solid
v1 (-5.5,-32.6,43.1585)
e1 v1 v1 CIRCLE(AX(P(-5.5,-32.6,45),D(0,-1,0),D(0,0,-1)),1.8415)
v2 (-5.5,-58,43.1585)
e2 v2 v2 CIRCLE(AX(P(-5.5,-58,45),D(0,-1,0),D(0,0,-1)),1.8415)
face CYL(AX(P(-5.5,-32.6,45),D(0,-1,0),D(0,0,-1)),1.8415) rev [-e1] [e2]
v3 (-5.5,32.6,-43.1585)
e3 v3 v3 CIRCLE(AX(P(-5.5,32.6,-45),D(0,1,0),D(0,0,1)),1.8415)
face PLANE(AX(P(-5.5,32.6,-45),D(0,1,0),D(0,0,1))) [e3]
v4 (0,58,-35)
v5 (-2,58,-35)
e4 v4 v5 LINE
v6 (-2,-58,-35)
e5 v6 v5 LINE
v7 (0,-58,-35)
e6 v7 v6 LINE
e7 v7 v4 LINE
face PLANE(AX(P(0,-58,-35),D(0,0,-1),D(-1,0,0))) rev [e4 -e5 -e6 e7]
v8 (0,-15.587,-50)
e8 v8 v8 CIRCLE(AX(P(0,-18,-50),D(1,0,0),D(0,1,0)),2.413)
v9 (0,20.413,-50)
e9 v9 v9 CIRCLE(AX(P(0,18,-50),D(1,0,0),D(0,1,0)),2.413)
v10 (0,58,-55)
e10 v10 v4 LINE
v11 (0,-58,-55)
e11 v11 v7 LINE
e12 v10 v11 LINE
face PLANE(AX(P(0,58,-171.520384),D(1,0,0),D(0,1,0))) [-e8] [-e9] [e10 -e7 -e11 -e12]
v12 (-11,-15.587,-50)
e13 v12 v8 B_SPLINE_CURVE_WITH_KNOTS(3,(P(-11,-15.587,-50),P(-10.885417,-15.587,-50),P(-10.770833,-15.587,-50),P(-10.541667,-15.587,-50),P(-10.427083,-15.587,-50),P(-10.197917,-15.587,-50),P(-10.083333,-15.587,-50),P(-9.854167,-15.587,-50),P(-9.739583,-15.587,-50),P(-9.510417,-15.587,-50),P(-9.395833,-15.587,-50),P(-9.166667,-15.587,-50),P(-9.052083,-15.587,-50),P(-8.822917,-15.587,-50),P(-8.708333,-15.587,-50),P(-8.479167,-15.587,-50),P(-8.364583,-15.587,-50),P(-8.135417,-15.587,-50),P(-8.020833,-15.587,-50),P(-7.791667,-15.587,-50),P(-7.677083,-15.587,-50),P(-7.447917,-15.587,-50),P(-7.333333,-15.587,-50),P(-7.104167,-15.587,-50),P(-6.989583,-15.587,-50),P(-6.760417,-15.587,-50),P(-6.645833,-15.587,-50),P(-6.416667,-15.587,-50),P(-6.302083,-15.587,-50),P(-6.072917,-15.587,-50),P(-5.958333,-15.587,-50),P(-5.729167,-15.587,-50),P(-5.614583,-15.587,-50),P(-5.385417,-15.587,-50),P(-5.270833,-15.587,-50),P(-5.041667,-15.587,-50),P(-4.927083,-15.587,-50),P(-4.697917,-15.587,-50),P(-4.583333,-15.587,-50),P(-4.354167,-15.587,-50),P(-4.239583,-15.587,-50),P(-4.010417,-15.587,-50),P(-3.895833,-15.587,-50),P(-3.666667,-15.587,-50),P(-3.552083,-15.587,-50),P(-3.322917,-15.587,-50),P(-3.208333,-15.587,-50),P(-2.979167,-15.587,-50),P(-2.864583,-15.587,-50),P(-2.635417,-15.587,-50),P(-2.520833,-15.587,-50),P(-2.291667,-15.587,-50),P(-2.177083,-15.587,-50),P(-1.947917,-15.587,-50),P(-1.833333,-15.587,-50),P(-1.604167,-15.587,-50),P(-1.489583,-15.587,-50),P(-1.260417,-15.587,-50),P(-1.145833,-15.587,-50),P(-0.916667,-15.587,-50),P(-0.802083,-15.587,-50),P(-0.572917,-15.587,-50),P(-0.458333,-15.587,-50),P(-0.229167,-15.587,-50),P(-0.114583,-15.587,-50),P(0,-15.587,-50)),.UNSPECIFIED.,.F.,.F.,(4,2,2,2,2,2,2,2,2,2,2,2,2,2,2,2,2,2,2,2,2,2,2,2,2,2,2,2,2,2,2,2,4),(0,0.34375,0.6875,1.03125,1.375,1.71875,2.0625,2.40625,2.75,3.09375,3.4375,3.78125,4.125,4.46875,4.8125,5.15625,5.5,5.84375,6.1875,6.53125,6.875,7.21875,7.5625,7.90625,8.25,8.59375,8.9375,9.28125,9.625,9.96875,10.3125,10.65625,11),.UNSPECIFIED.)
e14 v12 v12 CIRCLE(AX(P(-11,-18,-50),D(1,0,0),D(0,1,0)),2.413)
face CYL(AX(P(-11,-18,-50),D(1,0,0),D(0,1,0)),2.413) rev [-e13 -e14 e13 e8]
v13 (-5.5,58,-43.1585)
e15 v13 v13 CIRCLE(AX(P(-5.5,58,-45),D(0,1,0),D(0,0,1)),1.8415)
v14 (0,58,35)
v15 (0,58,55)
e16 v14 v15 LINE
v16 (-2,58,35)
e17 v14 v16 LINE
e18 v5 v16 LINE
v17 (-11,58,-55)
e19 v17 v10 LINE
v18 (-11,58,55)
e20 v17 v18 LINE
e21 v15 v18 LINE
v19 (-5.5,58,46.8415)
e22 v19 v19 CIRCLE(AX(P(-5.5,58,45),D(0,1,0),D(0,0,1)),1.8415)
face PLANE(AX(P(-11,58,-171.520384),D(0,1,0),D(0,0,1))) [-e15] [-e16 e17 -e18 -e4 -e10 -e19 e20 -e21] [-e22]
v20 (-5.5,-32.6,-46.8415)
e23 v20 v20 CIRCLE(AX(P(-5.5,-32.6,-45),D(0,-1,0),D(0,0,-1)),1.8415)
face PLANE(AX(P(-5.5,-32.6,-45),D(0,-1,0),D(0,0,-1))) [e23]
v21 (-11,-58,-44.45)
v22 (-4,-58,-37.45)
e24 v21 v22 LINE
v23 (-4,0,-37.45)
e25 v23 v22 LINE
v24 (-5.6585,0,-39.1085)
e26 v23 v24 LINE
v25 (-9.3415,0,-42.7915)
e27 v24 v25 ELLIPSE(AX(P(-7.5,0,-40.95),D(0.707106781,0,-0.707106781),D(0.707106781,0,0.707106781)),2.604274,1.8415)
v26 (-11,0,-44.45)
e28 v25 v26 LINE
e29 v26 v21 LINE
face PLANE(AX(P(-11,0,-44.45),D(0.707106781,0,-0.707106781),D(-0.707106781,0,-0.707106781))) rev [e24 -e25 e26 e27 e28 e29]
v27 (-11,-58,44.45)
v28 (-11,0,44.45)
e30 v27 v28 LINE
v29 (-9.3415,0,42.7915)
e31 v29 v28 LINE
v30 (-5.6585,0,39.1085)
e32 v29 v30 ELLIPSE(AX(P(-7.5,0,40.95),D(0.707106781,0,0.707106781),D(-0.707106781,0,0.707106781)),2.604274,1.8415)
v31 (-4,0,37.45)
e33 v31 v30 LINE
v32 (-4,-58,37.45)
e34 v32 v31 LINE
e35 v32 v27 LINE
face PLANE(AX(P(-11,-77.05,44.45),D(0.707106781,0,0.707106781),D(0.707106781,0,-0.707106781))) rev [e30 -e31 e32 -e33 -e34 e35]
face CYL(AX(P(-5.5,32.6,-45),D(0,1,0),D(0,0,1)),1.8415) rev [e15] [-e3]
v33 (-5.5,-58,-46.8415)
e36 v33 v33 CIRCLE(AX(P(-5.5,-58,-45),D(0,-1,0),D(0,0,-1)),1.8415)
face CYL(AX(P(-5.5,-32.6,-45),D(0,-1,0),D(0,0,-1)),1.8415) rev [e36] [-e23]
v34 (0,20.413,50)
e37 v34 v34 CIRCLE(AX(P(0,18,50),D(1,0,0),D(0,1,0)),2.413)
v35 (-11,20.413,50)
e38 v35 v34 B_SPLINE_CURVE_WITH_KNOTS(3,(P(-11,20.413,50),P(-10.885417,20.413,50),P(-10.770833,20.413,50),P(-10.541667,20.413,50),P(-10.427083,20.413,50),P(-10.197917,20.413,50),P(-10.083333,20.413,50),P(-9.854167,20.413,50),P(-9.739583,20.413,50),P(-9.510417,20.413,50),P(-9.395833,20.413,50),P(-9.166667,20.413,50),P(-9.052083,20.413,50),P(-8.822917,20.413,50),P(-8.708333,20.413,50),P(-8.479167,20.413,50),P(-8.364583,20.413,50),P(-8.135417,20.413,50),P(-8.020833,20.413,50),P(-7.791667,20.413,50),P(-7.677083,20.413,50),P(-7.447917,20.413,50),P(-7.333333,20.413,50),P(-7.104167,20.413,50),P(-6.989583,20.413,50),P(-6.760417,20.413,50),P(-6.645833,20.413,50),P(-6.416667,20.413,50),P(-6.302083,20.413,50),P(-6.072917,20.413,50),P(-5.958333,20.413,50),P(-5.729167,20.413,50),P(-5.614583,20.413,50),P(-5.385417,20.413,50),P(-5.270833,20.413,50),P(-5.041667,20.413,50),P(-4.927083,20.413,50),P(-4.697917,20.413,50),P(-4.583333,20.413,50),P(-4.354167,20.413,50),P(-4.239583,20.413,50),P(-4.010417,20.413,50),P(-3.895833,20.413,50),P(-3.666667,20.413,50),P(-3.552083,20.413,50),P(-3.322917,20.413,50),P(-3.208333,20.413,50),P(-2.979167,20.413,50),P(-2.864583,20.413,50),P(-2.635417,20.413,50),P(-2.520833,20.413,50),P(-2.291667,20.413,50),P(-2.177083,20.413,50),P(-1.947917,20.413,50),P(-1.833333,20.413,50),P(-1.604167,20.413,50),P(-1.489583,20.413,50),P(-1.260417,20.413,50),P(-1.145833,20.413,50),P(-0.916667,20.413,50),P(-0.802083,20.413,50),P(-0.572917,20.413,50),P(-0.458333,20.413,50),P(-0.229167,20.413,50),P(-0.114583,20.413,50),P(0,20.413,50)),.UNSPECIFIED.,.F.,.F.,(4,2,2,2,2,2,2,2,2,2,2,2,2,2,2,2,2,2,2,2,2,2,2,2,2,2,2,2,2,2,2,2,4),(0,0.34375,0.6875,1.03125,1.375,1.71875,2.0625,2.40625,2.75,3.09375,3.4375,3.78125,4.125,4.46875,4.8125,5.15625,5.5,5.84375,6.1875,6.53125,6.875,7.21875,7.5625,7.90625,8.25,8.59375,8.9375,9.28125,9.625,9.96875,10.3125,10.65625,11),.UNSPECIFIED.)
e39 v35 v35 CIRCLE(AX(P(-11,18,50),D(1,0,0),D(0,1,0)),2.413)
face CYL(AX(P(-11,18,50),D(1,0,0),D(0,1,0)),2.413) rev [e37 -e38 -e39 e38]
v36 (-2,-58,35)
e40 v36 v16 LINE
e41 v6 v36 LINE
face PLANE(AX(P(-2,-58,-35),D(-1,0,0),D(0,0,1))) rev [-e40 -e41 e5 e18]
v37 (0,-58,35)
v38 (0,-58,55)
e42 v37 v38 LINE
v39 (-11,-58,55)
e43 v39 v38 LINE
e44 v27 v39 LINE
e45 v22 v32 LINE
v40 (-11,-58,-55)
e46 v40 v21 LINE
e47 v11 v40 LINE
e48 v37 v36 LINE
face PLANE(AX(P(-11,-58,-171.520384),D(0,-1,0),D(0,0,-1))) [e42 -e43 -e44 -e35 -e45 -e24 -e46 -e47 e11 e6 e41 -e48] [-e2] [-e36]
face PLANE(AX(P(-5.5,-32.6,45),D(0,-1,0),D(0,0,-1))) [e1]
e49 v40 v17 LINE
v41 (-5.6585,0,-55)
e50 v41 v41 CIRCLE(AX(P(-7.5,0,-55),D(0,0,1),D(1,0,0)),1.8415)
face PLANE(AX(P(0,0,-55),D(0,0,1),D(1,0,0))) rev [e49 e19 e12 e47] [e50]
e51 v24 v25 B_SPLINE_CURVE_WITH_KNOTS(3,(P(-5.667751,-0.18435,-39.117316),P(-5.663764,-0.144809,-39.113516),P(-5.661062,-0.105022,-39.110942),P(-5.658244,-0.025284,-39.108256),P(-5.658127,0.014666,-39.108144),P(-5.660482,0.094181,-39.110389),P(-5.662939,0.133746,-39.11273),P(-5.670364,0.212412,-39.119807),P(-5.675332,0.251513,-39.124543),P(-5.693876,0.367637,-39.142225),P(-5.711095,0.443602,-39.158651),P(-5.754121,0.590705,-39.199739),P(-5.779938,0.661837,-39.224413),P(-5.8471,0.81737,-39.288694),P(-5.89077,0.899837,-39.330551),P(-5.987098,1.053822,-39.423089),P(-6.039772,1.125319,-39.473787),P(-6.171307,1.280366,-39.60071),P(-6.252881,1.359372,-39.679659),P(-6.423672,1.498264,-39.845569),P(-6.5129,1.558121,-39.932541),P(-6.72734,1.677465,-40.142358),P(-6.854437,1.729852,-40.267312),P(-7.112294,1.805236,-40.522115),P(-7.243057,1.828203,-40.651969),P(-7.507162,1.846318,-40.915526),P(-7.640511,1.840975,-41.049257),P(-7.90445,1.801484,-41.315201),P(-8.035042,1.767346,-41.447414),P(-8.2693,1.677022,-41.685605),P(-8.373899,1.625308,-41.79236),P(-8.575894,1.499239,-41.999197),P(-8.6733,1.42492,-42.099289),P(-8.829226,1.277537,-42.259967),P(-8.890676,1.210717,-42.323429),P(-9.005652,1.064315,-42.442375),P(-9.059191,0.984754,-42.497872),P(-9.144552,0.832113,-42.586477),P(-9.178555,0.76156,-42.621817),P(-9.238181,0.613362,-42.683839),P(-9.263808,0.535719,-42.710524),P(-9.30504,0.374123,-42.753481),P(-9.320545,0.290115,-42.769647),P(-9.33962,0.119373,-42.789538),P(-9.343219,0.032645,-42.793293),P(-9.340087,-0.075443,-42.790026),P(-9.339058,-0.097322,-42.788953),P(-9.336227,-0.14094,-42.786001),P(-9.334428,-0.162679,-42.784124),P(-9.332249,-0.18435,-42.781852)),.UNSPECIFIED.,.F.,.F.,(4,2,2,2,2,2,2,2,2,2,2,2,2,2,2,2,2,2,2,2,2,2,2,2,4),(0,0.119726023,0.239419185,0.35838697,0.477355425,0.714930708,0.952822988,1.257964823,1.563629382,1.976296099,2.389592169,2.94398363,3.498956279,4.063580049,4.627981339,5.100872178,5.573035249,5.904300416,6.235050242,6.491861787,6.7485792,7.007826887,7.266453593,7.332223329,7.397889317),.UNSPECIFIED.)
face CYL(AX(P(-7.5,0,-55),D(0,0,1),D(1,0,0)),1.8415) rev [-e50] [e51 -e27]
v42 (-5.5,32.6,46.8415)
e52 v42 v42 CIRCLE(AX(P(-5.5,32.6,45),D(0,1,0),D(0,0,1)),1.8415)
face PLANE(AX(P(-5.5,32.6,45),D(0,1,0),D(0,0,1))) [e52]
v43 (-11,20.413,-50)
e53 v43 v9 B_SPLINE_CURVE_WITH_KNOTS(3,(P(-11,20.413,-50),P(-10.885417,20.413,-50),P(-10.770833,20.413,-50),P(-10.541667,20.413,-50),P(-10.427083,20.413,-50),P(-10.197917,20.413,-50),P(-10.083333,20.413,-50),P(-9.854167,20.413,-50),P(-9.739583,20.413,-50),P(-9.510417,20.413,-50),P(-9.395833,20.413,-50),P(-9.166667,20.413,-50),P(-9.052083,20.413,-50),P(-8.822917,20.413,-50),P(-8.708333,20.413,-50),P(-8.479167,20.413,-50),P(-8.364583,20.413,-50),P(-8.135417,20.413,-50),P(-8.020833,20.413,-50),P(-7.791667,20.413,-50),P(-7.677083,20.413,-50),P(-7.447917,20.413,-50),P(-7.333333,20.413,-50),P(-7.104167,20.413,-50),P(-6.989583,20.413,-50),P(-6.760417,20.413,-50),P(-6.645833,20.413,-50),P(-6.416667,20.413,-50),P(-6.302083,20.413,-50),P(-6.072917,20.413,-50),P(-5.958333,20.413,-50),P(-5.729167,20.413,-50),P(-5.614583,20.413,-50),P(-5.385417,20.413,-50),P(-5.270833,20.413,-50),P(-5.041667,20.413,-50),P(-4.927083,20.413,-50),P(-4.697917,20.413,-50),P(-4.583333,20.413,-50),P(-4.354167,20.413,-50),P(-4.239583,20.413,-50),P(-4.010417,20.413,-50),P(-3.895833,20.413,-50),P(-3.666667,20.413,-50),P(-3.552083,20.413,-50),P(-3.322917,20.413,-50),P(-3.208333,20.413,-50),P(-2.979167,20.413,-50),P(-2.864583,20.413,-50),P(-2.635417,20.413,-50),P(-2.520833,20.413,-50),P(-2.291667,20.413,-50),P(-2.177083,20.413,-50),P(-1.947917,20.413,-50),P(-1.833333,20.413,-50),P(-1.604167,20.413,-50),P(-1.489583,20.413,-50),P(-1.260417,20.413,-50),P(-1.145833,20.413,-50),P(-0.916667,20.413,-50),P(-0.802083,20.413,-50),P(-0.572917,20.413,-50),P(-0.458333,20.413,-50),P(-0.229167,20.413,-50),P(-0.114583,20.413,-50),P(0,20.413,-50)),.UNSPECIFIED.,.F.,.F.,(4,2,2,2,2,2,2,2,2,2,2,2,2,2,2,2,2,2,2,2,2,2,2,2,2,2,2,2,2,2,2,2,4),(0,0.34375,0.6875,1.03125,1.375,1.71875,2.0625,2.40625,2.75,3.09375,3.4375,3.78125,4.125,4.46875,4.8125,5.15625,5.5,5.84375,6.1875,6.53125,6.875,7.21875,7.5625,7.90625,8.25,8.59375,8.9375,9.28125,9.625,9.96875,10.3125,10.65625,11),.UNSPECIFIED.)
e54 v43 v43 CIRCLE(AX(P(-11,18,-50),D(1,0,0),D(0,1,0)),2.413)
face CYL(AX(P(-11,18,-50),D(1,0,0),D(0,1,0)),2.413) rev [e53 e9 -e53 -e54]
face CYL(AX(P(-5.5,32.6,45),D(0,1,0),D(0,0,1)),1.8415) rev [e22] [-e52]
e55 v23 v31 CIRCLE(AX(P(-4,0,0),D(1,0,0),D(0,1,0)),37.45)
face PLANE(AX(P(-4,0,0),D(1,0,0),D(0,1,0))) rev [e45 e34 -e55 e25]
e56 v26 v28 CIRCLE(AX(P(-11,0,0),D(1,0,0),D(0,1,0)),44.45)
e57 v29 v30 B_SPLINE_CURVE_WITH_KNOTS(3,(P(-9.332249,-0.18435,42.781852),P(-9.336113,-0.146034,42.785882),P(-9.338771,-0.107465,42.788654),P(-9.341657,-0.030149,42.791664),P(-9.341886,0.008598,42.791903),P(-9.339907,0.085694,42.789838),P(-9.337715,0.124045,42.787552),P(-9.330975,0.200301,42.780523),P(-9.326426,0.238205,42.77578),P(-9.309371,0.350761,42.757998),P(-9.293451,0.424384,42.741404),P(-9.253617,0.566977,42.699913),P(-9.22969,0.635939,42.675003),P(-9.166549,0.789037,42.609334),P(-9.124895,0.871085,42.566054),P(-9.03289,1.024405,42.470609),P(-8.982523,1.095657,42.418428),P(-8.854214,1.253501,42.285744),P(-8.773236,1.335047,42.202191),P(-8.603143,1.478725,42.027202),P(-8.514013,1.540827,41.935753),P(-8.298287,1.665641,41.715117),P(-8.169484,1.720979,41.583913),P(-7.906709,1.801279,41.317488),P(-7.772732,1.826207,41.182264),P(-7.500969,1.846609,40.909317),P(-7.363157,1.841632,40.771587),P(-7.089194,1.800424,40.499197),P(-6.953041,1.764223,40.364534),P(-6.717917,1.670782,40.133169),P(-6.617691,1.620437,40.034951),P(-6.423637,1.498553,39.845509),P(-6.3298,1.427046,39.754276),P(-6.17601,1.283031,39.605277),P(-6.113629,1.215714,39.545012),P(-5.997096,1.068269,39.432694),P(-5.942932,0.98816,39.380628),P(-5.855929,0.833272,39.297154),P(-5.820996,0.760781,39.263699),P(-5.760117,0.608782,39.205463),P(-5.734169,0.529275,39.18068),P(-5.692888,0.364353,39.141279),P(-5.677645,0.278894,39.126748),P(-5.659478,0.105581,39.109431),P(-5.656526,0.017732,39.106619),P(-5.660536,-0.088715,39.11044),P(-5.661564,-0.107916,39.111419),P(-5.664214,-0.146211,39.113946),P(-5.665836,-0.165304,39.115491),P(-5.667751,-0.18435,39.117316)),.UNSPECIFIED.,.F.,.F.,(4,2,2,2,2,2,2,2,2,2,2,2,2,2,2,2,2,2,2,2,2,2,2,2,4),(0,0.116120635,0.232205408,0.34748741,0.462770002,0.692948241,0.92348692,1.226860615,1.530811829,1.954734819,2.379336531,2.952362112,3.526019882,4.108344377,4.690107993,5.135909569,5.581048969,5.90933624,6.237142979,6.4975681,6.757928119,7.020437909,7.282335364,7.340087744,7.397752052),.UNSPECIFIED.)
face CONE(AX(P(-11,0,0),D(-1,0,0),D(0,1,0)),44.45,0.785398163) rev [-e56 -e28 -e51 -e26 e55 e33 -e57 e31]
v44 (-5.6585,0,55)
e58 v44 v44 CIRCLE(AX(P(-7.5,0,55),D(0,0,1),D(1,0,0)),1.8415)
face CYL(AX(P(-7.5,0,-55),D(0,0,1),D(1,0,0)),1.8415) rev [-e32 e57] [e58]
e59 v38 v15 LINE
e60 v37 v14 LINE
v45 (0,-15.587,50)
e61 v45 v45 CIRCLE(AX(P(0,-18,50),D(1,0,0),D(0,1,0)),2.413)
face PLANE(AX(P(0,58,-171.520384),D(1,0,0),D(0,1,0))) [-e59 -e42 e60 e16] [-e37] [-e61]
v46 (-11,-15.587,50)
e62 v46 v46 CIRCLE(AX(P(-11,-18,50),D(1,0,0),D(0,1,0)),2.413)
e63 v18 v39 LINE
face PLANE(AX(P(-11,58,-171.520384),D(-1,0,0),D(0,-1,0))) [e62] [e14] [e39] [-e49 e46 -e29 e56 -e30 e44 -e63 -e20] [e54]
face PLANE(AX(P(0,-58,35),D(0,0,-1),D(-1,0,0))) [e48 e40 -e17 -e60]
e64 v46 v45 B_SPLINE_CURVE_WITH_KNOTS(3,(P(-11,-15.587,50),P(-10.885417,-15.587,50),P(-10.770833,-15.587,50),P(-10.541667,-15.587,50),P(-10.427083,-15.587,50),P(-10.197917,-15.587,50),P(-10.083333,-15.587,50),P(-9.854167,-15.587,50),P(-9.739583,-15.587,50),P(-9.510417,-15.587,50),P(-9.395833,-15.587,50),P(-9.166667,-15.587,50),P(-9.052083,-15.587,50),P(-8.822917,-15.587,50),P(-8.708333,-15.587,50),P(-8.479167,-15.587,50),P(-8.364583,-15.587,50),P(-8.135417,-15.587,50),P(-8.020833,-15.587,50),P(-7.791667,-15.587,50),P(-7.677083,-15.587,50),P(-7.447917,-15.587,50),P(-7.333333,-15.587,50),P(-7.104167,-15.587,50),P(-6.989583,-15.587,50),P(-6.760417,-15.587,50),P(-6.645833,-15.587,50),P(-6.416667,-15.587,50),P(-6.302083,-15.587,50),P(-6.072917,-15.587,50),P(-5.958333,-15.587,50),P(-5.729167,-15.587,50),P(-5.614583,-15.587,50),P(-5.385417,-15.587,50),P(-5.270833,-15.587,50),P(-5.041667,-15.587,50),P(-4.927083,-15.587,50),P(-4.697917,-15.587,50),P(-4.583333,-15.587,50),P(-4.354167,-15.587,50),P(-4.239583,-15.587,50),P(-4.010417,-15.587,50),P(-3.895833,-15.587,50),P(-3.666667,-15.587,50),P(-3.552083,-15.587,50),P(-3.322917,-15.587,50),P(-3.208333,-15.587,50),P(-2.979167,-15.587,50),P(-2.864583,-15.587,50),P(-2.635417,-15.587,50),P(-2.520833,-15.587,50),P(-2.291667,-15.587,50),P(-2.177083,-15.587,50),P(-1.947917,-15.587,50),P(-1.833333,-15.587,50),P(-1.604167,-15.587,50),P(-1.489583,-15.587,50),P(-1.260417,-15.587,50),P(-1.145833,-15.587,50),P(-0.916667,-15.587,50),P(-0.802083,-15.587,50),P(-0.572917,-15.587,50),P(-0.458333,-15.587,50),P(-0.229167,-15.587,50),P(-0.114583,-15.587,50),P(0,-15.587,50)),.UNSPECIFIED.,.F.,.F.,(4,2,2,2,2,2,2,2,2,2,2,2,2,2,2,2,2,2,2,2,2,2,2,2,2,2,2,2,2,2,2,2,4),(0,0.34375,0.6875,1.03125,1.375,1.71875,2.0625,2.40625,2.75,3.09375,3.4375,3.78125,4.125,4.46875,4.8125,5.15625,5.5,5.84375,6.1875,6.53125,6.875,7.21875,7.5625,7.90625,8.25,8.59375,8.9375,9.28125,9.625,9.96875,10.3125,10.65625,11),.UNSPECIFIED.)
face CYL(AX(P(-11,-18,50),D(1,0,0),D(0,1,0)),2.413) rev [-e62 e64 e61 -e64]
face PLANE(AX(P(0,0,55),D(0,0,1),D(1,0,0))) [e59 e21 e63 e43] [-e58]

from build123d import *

# Parameters (mm, degrees)
SKETCH2_W              = 11
SKETCH2_H              = 116
BOSS_EXTRUDE2_DEPTH    = 109.999999964
SKETCH3_W              = 2
SKETCH3_H              = 70
CUT_EXTRUDE1_DEPTH     = 129.848748531
CUT_EXTRUDE2_DEPTH     = 7
CUT_EXTRUDE2_DRAFT     = -45
CUT_EXTRUDE3_START     = -109.999999964
CUT_EXTRUDE3_OUTLINE_R = 1.8415
CUT_EXTRUDE3_DEPTH     = 109.999999964
SKETCH7_R              = 1.8415
CUT_EXTRUDE4_DEPTH     = 25.4
CUT_EXTRUDE5_START     = -25.4
SKETCH8_R              = 1.8415
CUT_EXTRUDE5_DEPTH     = 25.4
SKETCH9_R              = 2.413
CUT_EXTRUDE6_DEPTH     = 81.684571085


# Read off the part's stored shape, not the designer's step: Cut-Extrude3
with BuildPart() as part:
    # Sketch2 → Boss-Extrude2 (new body)
    with BuildSketch(Plane.XY.offset(54.999999982)):
        with Locations((-5.5, 0)):
            Rectangle(SKETCH2_W, SKETCH2_H)
    extrude(amount=-BOSS_EXTRUDE2_DEPTH)

    # Sketch3 → Cut-Extrude1 (cut, through all)
    with BuildSketch(Plane(origin=(0, 58, 0), x_dir=(1, 0, 0), z_dir=(0, 1, 0))):
        with Locations((-1, 1.8e-08)):
            Rectangle(SKETCH3_W, SKETCH3_H)
    extrude(amount=-CUT_EXTRUDE1_DEPTH, mode=Mode.SUBTRACT)


with BuildPart() as cut_extrude2_tool:
    # Sketch5 → Cut-Extrude2 (with draft: the straight prism first)
    with BuildSketch(Plane.ZY.offset(11)):
        with BuildLine():
            Line((-44.45, 0), (-44.45, -77.05))
            Line((-44.45, -77.05), (44.45, -77.05))
            Line((44.45, -77.05), (44.45, 0))
            ThreePointArc((44.45, 0), (0, 44.45), (-44.45, 0))
        make_face()
    extrude(amount=-CUT_EXTRUDE2_DEPTH)
    # Cut-Extrude2: the draft: its side faces are tilted about the plane it starts from
    cut_extrude2_sides = [cut_extrude2_tool.faces().sort_by_distance(p)[0] for p in [
        (-7.5, -38.525, -44.45),
        (-7.5, -77.05, 0),
        (-7.5, -38.525, 44.45),
        (-7.5, 44.45, 0),
    ]]
    draft(cut_extrude2_sides, Plane.ZY.offset(11), CUT_EXTRUDE2_DRAFT)


with BuildPart() as part_1:
    add(part.part)

    # Cut-Extrude2: cut by cut_extrude2_tool
    add(cut_extrude2_tool.part, mode=Mode.SUBTRACT)

    # Cut-Extrude3 outline → Cut-Extrude3 (cut)
    with BuildSketch(Plane.XY.offset(54.999999982).offset(CUT_EXTRUDE3_START)):
        with Locations((-7.5, 0)):
            Circle(CUT_EXTRUDE3_OUTLINE_R)
    extrude(amount=CUT_EXTRUDE3_DEPTH, mode=Mode.SUBTRACT)

    # Sketch7 → Cut-Extrude4 (cut)
    with BuildSketch(Plane(origin=(0, 58, 0), x_dir=(1, 0, 0), z_dir=(0, 1, 0))):
        with Locations(Location((-5.5, -44.999999982, 0), (0, 0, 270))):
            Circle(SKETCH7_R)
        with Locations(Location((-5.5, 44.999999982, 0), (0, 0, 270))):
            Circle(SKETCH7_R)
    extrude(amount=-CUT_EXTRUDE4_DEPTH, mode=Mode.SUBTRACT)

    # Sketch8 → Cut-Extrude5 (cut)
    with BuildSketch(Plane.XZ.offset(58).offset(CUT_EXTRUDE5_START)):
        with Locations(Location((-5.5, 44.999999982, 0), (0, 0, 90))):
            Circle(SKETCH8_R)
        with Locations(Location((-5.5, -44.999999982, 0), (0, 0, 90))):
            Circle(SKETCH8_R)
    extrude(amount=CUT_EXTRUDE5_DEPTH, mode=Mode.SUBTRACT)

    # Sketch9 → Cut-Extrude6 (cut, through all)
    with BuildSketch(Plane(origin=(0, 0, 0), x_dir=(0, 0, -1), z_dir=(1, 0, 0))):
        with Locations(Location((-49.999999982, 18, 0), (0, 0, 90))):
            Circle(SKETCH9_R)
        with Locations(Location((-49.999999982, -18, 0), (0, 0, 90))):
            Circle(SKETCH9_R)
        with Locations(Location((49.999999982, -18, 0), (0, 0, 90))):
            Circle(SKETCH9_R)
        with Locations(Location((49.999999982, 18, 0), (0, 0, 90))):
            Circle(SKETCH9_R)
    extrude(amount=-CUT_EXTRUDE6_DEPTH, mode=Mode.SUBTRACT)


solid = part_1.part
